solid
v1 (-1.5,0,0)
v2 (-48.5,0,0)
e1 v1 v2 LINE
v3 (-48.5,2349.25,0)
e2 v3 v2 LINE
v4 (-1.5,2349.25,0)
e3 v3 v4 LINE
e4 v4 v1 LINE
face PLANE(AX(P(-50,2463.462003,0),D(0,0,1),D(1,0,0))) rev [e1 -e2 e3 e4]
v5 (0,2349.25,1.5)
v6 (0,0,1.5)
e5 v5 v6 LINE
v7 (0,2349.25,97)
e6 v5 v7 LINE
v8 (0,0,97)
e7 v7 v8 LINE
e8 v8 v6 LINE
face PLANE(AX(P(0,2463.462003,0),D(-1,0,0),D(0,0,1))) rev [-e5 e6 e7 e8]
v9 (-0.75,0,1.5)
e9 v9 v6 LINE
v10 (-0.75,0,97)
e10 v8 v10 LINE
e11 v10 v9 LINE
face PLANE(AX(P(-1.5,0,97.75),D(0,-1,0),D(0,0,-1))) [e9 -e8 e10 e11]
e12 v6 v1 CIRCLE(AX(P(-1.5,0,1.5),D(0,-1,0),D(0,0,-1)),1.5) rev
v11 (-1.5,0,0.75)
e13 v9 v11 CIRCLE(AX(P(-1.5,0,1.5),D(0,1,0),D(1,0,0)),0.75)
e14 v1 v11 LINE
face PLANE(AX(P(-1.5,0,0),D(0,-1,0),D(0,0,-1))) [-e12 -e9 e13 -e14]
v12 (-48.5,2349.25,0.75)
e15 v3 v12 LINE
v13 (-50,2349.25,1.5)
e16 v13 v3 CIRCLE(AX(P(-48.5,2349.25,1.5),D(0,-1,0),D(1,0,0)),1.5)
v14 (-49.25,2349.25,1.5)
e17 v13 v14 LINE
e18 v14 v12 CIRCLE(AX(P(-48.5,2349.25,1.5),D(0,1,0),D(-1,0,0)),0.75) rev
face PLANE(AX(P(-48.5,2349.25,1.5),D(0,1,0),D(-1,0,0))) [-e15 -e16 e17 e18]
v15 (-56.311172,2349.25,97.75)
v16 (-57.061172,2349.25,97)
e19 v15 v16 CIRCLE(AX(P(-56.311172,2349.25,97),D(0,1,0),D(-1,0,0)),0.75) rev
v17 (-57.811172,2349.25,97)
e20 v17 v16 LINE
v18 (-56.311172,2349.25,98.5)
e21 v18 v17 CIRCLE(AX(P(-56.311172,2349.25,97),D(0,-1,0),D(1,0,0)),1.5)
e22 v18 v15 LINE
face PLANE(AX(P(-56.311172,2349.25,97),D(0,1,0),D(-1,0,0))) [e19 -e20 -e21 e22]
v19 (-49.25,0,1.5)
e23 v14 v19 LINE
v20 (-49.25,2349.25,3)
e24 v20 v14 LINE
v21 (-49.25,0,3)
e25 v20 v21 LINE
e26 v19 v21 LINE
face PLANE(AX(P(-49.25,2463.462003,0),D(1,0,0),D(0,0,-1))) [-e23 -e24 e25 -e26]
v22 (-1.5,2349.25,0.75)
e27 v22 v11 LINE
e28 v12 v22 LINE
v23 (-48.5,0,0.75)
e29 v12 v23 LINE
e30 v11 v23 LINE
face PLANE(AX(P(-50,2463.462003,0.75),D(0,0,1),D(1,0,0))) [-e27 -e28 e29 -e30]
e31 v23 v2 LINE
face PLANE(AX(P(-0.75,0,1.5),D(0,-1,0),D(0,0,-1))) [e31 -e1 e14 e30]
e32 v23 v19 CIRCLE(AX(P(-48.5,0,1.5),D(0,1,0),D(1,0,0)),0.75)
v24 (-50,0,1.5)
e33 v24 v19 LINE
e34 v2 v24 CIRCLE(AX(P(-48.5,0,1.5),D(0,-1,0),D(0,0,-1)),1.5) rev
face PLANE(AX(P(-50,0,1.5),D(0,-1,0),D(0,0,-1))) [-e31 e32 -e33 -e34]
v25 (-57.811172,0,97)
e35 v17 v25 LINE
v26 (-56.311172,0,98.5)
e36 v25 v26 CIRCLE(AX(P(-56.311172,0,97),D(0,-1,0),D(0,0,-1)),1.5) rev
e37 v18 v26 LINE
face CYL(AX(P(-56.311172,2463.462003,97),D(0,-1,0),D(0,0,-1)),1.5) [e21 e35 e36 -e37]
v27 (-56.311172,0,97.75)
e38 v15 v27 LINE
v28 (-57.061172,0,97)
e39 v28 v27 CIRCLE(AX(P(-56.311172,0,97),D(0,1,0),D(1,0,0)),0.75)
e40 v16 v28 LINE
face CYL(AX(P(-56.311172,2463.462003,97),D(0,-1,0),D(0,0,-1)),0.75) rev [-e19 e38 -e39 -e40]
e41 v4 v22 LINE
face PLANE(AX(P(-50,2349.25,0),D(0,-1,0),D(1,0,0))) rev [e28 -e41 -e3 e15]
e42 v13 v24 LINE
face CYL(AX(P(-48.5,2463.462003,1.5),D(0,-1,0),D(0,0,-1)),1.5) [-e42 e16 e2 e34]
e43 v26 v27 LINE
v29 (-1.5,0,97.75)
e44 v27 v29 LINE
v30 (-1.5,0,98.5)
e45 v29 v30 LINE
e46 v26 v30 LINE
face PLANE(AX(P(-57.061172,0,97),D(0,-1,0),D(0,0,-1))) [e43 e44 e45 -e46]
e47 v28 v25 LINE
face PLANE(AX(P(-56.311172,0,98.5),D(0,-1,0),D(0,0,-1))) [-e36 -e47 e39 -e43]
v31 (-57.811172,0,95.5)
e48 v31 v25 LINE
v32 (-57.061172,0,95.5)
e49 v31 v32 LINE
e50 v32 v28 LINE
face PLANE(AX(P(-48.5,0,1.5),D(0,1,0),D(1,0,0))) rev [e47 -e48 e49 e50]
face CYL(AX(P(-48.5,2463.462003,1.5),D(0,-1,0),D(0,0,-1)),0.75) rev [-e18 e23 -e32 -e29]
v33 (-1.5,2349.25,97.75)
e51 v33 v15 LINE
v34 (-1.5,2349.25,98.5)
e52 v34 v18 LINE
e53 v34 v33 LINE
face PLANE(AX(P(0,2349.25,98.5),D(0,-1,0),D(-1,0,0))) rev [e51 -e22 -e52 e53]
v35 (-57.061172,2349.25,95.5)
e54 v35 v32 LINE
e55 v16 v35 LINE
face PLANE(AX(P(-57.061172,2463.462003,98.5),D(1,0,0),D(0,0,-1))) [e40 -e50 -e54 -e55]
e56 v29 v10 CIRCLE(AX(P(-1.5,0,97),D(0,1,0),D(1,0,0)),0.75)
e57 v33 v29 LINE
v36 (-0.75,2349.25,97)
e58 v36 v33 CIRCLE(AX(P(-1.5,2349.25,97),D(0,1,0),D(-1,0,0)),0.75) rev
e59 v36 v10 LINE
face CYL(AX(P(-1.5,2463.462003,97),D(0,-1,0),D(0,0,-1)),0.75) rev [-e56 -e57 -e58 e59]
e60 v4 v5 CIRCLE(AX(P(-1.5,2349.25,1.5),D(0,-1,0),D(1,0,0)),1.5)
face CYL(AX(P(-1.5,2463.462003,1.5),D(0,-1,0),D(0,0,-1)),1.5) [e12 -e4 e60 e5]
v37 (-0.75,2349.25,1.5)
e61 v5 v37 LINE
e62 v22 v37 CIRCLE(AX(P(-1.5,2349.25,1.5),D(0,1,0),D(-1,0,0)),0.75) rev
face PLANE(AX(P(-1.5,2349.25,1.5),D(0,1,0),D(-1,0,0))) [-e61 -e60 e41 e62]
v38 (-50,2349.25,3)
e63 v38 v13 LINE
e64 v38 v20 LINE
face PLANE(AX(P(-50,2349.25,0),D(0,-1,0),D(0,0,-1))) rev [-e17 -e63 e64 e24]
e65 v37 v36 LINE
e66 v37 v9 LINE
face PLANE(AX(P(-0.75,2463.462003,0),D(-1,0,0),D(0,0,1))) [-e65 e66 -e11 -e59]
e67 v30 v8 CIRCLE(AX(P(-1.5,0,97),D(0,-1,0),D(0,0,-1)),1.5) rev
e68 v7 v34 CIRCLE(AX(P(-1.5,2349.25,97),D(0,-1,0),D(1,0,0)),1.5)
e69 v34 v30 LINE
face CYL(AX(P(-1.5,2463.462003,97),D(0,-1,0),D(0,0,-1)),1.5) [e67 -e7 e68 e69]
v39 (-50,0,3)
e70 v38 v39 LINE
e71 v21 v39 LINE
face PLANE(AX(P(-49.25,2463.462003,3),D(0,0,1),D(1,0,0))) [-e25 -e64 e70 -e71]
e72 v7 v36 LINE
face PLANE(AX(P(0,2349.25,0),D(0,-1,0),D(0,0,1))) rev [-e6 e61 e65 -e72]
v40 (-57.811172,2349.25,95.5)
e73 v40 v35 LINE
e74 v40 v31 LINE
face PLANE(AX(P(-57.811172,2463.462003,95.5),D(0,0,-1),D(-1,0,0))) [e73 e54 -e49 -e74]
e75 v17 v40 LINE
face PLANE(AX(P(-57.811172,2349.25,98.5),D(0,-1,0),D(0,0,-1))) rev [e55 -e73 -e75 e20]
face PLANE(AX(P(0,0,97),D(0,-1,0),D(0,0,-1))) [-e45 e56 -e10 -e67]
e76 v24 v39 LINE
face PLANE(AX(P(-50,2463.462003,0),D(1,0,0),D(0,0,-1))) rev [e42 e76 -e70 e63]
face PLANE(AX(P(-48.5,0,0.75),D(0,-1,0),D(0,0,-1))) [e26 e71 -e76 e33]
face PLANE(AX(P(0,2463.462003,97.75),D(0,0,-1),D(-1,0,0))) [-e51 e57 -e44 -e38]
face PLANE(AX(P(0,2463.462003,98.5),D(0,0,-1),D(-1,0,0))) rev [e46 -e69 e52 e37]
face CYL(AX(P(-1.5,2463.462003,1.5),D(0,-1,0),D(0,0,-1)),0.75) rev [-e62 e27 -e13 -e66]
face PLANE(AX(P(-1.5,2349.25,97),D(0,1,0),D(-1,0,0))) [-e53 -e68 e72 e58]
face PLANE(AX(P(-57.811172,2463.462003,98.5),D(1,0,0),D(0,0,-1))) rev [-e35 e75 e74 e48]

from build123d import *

# Parameters (mm, degrees)
SM_BASE_FLANGE_1_DEPTH = 2349.25


# Sheet-metal steps are written as plain solids
with BuildPart() as part:
    # Sketch 1 → Базовая кромка1 (new body)
    with BuildSketch(Plane(origin=(0, 0, 0), x_dir=(1, 0, 0), z_dir=(0, 1, 0))):
        with BuildLine():
            Line((-50, -3), (-50, -1.5))
            ThreePointArc((-50, -1.5), (-49.560660172, -0.439339828), (-48.5, 0))
            Line((-48.5, 0), (-1.5, 0))
            ThreePointArc((-1.5, 0), (-0.439339828, -0.439339828), (0, -1.5))
            Line((0, -1.5), (0, -97))
            ThreePointArc((0, -97), (-0.439339828, -98.060660172), (-1.5, -98.5))
            Line((-1.5, -98.5), (-56.31117163, -98.5))
            ThreePointArc((-56.31117163, -98.5), (-57.371831802, -98.060660172), (-57.81117163, -97))
            Line((-57.81117163, -97), (-57.81117163, -95.5))
            Line((-57.81117163, -95.5), (-57.06117163, -95.5))
            Line((-57.06117163, -95.5), (-57.06117163, -97))
            ThreePointArc((-57.06117163, -97), (-56.841501716, -97.530330086), (-56.31117163, -97.75))
            Line((-56.31117163, -97.75), (-1.5, -97.75))
            ThreePointArc((-1.5, -97.75), (-0.969669914, -97.530330086), (-0.75, -97))
            Line((-0.75, -97), (-0.75, -1.5))
            ThreePointArc((-0.75, -1.5), (-0.969669914, -0.969669914), (-1.5, -0.75))
            Line((-1.5, -0.75), (-48.5, -0.75))
            ThreePointArc((-48.5, -0.75), (-49.030330086, -0.969669914), (-49.25, -1.5))
            Line((-49.25, -1.5), (-49.25, -3))
            Line((-49.25, -3), (-50, -3))
        make_face()
    extrude(amount=SM_BASE_FLANGE_1_DEPTH)


solid = part.part
